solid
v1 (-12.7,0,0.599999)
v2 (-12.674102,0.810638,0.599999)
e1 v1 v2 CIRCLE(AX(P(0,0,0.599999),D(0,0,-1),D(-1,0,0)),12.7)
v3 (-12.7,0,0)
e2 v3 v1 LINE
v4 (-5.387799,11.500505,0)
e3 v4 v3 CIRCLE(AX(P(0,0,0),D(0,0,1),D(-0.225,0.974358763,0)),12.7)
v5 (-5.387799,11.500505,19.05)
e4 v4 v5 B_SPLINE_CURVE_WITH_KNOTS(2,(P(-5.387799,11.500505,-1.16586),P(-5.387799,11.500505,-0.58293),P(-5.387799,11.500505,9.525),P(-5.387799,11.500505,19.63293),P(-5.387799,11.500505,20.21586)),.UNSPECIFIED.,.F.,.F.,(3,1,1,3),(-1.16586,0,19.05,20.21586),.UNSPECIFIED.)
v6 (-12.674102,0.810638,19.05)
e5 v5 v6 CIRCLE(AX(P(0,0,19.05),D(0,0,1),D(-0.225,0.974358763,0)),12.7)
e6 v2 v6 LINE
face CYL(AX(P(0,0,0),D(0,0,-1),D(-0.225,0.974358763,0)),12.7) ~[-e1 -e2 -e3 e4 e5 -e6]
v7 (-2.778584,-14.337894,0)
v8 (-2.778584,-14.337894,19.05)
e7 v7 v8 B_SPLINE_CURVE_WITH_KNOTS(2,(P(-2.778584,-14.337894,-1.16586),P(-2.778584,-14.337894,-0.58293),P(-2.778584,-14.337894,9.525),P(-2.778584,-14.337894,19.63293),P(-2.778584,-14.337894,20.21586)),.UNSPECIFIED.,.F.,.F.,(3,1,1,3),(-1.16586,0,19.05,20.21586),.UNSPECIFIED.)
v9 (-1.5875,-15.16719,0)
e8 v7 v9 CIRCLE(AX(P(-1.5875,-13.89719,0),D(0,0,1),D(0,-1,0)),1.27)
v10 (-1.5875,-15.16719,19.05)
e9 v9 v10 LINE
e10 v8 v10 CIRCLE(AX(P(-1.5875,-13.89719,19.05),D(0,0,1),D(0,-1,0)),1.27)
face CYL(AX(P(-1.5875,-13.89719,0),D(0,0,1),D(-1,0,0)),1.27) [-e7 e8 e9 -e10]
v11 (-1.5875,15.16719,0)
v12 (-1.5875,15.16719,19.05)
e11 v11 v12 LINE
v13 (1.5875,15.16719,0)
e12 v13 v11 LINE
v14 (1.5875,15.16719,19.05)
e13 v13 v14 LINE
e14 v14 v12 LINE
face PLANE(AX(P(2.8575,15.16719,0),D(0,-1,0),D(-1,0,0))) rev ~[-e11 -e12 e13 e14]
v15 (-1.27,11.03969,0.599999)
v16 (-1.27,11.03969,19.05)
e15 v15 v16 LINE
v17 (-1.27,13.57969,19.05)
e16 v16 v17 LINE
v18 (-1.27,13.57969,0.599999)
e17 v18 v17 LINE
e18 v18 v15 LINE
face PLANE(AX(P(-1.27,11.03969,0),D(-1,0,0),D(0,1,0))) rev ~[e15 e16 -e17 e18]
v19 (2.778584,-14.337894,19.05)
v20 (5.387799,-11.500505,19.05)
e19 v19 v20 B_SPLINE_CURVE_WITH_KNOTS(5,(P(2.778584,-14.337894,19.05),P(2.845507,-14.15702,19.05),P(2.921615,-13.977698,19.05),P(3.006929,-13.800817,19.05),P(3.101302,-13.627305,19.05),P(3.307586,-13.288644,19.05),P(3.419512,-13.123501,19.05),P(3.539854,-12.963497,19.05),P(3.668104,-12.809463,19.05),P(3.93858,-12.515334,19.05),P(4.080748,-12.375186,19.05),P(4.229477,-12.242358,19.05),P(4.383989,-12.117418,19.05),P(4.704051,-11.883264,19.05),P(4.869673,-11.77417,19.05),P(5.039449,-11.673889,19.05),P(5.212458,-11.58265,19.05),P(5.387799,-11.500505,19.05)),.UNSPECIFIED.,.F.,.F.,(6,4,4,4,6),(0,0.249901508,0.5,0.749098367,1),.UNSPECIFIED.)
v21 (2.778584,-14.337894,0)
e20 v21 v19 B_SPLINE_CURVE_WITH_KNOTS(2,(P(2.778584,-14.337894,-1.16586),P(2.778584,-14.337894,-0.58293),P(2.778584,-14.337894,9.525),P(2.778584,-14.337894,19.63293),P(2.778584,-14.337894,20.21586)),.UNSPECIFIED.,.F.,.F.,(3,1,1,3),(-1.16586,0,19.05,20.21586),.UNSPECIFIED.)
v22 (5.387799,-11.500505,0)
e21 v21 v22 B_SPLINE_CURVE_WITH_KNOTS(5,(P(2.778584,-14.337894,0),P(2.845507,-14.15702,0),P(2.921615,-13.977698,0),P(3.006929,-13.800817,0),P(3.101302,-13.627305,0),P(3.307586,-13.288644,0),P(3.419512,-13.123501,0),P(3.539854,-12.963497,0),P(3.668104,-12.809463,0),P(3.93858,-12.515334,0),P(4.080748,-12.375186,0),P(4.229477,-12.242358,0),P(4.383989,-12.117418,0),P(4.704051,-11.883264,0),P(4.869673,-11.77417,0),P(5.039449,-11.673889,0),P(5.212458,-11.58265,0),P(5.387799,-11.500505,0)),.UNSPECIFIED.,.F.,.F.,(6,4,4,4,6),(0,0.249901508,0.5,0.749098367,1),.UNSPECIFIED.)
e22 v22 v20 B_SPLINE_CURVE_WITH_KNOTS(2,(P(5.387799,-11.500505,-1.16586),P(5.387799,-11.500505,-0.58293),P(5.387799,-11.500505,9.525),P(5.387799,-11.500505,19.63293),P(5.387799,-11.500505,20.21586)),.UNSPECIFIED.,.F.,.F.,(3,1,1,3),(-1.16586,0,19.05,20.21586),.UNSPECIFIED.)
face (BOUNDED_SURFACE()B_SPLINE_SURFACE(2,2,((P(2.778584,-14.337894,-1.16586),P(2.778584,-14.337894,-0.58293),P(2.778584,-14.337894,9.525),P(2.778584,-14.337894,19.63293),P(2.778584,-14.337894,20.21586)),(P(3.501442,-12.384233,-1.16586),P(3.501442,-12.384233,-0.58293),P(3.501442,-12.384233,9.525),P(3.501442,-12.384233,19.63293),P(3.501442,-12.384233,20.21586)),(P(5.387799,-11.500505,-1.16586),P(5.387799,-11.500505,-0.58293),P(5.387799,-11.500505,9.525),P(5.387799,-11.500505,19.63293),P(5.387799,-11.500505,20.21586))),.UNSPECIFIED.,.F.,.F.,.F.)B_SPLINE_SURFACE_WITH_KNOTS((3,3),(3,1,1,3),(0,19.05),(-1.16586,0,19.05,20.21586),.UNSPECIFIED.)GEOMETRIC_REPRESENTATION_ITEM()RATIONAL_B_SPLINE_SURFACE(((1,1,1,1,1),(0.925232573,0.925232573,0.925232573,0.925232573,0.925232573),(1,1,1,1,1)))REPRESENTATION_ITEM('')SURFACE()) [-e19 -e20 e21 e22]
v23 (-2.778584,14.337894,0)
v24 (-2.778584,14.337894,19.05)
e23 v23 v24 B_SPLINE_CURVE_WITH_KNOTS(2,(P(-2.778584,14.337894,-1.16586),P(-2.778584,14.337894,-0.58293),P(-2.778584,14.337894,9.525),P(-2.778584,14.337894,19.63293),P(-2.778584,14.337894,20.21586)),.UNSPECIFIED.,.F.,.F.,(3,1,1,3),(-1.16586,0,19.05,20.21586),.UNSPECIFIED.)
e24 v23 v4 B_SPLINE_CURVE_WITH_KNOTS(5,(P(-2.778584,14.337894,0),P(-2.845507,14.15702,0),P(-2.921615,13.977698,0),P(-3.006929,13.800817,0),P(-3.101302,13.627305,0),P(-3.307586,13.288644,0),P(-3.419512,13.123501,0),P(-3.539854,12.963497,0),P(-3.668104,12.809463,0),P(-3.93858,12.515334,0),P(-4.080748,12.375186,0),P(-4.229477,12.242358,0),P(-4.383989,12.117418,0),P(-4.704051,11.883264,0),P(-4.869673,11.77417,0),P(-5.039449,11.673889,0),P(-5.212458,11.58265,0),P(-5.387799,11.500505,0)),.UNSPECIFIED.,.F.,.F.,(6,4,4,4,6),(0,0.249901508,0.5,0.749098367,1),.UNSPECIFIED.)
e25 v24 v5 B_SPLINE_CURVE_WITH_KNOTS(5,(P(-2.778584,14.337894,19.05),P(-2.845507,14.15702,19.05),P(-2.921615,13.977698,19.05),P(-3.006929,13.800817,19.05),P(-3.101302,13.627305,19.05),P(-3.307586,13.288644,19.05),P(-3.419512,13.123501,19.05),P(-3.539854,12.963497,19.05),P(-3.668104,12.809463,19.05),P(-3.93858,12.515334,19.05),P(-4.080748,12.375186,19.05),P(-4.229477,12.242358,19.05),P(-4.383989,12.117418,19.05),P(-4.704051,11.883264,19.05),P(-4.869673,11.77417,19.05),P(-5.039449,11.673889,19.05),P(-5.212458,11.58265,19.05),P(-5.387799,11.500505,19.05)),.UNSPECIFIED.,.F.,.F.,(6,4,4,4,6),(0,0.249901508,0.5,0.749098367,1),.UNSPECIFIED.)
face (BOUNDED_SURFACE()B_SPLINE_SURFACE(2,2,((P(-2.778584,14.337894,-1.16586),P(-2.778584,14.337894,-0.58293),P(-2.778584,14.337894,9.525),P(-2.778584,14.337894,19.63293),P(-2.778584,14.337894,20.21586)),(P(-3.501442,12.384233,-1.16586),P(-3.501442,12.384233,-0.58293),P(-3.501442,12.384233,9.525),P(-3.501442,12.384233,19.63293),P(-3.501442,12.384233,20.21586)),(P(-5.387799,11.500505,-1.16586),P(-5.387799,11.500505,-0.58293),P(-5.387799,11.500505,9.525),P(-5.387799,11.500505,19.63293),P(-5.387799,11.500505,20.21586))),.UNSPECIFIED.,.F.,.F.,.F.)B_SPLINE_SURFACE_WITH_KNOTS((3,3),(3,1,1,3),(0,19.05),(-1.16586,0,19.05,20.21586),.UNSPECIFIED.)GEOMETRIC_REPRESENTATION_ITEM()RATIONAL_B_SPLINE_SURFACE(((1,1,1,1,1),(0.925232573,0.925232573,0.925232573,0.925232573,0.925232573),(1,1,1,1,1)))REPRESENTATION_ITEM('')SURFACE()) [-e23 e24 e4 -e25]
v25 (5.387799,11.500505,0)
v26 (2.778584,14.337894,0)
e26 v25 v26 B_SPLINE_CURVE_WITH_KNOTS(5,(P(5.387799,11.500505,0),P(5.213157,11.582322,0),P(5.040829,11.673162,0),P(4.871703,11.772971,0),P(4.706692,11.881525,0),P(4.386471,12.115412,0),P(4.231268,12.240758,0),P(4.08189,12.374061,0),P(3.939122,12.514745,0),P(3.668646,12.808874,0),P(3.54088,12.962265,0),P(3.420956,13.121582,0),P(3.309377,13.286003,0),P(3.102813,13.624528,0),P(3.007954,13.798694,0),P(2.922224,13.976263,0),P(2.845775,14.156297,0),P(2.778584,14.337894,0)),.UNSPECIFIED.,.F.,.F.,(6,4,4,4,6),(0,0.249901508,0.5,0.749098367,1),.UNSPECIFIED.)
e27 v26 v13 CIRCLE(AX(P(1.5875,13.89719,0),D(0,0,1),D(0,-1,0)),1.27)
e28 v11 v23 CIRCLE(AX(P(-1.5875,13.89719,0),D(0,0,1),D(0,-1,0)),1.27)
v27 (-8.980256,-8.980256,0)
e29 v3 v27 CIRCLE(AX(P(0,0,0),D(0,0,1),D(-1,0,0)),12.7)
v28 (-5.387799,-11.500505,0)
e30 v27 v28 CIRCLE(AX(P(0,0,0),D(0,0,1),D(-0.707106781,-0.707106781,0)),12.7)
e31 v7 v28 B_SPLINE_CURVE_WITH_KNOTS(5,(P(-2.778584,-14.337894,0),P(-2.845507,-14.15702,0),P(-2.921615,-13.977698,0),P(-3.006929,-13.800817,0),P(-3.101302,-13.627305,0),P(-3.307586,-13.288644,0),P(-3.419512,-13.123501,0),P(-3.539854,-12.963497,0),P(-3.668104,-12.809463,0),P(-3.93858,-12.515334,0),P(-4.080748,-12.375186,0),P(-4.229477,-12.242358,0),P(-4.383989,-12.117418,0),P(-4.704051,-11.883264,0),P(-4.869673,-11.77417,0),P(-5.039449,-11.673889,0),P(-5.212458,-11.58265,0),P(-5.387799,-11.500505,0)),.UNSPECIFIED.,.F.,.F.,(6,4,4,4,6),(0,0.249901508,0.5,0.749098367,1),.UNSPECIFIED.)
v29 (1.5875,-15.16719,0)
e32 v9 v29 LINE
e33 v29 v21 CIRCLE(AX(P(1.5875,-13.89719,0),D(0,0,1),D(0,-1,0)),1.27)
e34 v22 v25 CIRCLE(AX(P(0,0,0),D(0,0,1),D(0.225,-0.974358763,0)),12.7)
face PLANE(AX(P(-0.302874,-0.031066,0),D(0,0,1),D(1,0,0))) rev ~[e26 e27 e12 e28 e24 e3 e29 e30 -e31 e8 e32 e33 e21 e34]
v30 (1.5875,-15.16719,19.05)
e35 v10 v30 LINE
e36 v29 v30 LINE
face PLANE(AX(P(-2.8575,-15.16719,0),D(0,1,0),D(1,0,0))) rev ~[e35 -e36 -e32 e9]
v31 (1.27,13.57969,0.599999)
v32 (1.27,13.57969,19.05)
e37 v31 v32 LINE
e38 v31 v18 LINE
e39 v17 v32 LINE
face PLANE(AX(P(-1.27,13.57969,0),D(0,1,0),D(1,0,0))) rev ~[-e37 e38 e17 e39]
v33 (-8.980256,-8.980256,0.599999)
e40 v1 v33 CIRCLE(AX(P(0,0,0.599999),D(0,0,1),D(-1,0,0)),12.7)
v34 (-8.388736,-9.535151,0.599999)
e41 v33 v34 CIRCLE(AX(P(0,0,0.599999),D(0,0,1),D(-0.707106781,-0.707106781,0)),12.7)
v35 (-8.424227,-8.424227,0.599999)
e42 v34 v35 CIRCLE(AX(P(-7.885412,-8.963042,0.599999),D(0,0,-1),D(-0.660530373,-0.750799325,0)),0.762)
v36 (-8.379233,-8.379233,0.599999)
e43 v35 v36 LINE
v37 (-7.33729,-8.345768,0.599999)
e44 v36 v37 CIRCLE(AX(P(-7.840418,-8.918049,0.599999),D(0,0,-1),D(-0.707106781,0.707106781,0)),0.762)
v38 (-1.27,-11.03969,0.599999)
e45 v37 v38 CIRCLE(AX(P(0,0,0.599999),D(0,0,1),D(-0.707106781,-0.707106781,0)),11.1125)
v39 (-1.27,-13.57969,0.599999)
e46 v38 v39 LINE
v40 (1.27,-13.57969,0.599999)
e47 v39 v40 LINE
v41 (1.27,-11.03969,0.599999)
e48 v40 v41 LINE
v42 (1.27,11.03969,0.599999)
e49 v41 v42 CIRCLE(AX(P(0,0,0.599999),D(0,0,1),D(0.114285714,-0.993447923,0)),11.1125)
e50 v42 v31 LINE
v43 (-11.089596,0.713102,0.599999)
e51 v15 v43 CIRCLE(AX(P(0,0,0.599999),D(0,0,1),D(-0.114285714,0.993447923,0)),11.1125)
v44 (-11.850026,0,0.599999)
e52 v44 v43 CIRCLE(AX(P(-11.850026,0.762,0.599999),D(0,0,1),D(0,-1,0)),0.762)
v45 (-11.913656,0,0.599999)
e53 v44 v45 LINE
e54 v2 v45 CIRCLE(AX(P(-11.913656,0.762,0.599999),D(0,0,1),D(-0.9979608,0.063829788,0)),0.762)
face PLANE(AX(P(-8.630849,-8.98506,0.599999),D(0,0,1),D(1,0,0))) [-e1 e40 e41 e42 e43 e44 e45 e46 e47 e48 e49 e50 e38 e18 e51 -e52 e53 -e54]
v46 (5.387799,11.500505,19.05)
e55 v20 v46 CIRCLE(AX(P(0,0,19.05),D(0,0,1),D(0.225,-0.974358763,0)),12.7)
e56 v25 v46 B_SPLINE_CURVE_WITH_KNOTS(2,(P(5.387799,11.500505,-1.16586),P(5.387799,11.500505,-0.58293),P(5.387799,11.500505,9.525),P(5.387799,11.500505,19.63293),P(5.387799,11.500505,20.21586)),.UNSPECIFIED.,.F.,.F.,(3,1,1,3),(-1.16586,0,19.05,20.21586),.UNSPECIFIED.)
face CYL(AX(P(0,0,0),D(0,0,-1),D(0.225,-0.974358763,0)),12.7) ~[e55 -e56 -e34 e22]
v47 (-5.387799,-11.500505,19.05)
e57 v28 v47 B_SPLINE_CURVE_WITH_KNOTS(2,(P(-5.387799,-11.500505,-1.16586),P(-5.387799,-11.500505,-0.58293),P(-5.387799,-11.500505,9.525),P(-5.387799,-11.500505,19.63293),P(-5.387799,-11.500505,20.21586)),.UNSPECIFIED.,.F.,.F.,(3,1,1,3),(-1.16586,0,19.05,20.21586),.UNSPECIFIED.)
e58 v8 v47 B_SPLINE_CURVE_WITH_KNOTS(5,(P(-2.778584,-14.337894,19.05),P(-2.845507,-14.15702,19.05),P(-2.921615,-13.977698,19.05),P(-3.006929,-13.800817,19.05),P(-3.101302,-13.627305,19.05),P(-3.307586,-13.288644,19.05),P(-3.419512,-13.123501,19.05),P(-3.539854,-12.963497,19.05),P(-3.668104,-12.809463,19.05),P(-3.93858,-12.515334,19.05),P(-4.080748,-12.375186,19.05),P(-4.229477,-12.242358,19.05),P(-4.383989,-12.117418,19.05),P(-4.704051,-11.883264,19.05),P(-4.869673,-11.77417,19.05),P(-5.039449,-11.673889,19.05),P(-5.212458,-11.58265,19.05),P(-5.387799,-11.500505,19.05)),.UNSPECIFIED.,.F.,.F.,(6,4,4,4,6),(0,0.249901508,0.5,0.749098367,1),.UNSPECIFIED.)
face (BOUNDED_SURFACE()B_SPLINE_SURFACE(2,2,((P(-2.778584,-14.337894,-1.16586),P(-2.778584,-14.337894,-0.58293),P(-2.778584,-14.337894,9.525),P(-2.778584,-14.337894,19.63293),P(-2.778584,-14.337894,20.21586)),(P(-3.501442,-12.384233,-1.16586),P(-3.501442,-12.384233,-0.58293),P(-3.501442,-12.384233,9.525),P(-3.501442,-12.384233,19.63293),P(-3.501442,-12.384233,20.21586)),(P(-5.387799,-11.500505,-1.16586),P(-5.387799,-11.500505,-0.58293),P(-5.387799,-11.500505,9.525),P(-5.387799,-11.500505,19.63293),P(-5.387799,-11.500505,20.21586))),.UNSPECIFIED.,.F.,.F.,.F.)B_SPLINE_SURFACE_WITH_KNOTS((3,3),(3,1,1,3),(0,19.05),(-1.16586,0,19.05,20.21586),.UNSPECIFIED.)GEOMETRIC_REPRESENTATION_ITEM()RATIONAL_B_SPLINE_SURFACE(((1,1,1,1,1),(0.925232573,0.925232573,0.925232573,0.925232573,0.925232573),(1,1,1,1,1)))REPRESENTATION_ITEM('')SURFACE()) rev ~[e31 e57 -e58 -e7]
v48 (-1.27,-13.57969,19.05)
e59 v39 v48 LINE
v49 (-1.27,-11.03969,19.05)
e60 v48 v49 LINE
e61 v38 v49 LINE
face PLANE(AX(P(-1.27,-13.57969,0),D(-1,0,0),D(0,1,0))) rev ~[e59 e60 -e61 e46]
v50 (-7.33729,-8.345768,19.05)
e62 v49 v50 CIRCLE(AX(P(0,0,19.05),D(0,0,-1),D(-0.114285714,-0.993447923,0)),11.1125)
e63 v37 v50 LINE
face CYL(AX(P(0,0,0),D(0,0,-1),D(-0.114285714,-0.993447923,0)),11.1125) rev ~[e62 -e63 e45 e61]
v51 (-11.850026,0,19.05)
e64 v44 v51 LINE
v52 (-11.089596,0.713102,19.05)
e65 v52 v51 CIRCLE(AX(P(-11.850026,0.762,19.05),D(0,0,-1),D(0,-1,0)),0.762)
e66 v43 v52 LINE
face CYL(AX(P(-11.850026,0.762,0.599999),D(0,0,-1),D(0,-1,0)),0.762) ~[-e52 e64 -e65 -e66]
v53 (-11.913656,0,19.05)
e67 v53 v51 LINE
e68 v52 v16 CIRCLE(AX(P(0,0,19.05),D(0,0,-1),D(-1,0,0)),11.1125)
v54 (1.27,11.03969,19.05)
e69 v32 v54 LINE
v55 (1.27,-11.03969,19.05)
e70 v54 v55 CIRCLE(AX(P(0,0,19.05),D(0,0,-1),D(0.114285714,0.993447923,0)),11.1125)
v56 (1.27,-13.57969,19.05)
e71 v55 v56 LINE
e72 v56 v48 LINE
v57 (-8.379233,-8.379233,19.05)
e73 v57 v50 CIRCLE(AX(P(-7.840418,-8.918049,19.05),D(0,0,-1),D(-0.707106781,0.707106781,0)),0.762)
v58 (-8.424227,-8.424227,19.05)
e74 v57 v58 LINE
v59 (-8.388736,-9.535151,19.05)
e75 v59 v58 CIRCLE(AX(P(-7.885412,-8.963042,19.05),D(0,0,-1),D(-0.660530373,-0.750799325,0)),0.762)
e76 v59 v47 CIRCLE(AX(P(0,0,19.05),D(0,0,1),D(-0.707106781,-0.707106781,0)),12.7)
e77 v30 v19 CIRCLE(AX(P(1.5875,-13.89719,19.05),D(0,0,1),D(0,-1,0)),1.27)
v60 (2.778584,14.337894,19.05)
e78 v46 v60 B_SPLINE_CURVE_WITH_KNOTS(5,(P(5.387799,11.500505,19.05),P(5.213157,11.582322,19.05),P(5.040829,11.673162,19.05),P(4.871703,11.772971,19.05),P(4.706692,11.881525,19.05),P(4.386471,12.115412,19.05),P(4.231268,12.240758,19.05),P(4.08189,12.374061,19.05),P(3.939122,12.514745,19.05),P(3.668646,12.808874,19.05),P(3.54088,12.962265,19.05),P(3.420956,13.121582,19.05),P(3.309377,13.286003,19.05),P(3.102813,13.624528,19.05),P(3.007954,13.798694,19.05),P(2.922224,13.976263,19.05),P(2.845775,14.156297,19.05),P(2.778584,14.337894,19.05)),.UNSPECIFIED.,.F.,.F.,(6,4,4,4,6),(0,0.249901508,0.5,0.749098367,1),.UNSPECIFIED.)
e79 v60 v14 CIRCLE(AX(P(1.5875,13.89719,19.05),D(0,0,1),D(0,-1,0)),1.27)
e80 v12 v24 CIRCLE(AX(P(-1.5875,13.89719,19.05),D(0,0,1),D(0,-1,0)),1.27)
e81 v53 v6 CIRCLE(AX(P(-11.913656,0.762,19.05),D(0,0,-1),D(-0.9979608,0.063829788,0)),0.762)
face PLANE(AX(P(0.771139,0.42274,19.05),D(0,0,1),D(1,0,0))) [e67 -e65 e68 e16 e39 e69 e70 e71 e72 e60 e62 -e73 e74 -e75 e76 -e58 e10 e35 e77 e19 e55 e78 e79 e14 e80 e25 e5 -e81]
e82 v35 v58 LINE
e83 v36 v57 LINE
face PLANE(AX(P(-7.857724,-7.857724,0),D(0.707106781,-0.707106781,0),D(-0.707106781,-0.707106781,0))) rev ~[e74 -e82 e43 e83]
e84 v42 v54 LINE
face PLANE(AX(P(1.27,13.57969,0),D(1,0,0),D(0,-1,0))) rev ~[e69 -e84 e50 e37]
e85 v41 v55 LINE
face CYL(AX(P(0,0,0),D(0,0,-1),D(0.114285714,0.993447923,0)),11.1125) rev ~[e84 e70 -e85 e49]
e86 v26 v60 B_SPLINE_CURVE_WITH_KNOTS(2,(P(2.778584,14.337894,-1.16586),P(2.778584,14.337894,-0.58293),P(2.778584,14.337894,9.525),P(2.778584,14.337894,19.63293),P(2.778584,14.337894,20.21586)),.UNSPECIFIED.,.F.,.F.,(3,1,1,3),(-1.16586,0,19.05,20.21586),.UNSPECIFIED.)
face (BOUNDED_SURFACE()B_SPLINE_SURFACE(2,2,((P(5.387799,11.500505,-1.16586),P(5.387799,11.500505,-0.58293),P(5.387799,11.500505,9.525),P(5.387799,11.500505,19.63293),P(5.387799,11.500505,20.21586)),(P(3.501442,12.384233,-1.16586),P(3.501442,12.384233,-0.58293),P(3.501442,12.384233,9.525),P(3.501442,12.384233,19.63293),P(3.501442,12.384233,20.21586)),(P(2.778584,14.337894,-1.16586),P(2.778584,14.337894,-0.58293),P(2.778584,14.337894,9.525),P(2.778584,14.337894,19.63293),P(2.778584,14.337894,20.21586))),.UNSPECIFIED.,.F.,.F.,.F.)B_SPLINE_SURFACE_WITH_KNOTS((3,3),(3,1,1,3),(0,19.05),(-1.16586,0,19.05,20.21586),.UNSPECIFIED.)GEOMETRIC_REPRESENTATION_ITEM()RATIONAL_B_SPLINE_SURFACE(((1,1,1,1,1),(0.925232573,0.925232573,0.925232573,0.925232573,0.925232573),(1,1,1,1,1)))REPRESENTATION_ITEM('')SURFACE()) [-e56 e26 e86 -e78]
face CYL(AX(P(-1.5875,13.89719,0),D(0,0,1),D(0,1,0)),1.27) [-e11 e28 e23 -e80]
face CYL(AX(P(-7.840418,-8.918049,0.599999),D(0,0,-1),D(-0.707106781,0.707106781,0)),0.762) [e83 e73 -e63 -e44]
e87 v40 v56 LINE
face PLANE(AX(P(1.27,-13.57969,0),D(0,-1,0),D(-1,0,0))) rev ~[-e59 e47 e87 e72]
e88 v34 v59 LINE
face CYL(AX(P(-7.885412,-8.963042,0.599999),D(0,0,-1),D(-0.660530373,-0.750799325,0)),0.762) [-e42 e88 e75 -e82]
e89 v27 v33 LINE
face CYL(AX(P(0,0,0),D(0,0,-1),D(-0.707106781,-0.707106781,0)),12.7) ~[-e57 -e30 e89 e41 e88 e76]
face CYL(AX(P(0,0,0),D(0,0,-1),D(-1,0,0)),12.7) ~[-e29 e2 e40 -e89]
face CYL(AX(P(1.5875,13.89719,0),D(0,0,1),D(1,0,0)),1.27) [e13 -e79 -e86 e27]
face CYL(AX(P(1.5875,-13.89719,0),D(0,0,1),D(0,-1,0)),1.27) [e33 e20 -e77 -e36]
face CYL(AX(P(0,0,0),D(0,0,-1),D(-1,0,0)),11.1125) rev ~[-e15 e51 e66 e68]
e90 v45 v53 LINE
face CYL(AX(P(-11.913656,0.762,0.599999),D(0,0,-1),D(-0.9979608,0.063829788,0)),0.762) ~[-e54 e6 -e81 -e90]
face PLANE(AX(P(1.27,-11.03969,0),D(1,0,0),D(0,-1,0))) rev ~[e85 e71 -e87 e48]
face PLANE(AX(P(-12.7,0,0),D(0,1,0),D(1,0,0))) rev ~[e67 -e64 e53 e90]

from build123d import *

# Parameters (mm, degrees)
F1_DEPTH    = 0.5999988
F2_DEPTH    = 19.05
F3_R        = 1.27
F4_R        = 5.08
F5_T1_DEPTH = 20.4776308939
F5_T3_DEPTH = 20.2938151504


# Not quite as in the source:
# - a fillet or chamfer that OpenCascade refuses, or shapes differently, is made with other operations: its cross-section is extruded or revolved along the edge and cut away or added


with BuildPart() as f1:
    # F0 (on Top) → F1 (new body)
    with BuildSketch(Plane.XY):
        with BuildLine():
            Line((-1.27, 13.5796900432), (-1.27, 11.0396900432))
            ThreePointArc((-1.27, 11.0396900432), (-8.2945925533, 7.3950923338), (-11.1125, 0))
            ThreePointArc((-11.1125, 0), (-10.266611305, -4.2525696422), (-7.8577241059, -7.8577241059))
            ThreePointArc((-7.8577241059, -7.8577241059), (-4.8332249736, -10.0063775966), (-1.27, -11.0396900432))
            Line((-1.27, -11.0396900432), (-1.27, -13.5796900432))
            Line((-1.27, -13.5796900432), (0, -13.5796900432))
            Line((0, -13.5796900432), (1.27, -13.5796900432))
            Line((1.27, -13.5796900432), (1.27, -11.0396900432))
            ThreePointArc((1.27, -11.0396900432), (11.1125, 0), (1.27, 11.0396900432))
            Line((1.27, 11.0396900432), (1.27, 13.5796900432))
            Line((1.27, 13.5796900432), (0, 13.5796900432))
            Line((0, 13.5796900432), (-1.27, 13.5796900432))
        make_face()
        with BuildLine():
            ThreePointArc((-7.8577241059, -7.8577241059), (-10.266611305, -4.2525696422), (-11.1125, 0))
            Line((-11.1125, 0), (-12.7, 0))
            ThreePointArc((-12.7, 0), (-11.7332700629, -4.860079591), (-8.9802561211, -8.9802561211))
            Line((-8.9802561211, -8.9802561211), (-7.8577241059, -7.8577241059))
        make_face()
    extrude(amount=F1_DEPTH)

    # F0 (on Top) → F2 (join)
    with BuildSketch(Plane.XY):
        with BuildLine():
            ThreePointArc((-11.1125, 0), (-8.2945925533, 7.3950923338), (-1.27, 11.0396900432))
            Line((-1.27, 11.0396900432), (-1.27, 13.5796900432))
            Line((-1.27, 13.5796900432), (0, 13.5796900432))
            Line((0, 13.5796900432), (1.27, 13.5796900432))
            Line((1.27, 13.5796900432), (1.27, 11.0396900432))
            ThreePointArc((1.27, 11.0396900432), (11.1125, 0), (1.27, -11.0396900432))
            Line((1.27, -11.0396900432), (1.27, -13.5796900432))
            Line((1.27, -13.5796900432), (0, -13.5796900432))
            Line((0, -13.5796900432), (-1.27, -13.5796900432))
            Line((-1.27, -13.5796900432), (-1.27, -11.0396900432))
            ThreePointArc((-1.27, -11.0396900432), (-4.8332249736, -10.0063775966), (-7.8577241059, -7.8577241059))
            Line((-7.8577241059, -7.8577241059), (-8.9802561211, -8.9802561211))
            ThreePointArc((-8.9802561211, -8.9802561211), (-6.1573611633, -11.1075156315), (-2.8575, -12.3743562964))
            Line((-2.8575, -12.3743562964), (-2.8575, -15.1671900432))
            Line((-2.8575, -15.1671900432), (0, -15.1671900432))
            Line((0, -15.1671900432), (2.8575, -15.1671900432))
            Line((2.8575, -15.1671900432), (2.8575, -12.3743562964))
            ThreePointArc((2.8575, -12.3743562964), (12.7, 0), (2.8575, 12.3743562964))
            Line((2.8575, 12.3743562964), (2.8575, 15.1671900432))
            Line((2.8575, 15.1671900432), (0, 15.1671900432))
            Line((0, 15.1671900432), (-2.8575, 15.1671900432))
            Line((-2.8575, 15.1671900432), (-2.8575, 12.3743562964))
            ThreePointArc((-2.8575, 12.3743562964), (-9.93932216, 7.9056862447), (-12.7, 0))
            Line((-12.7, 0), (-11.1125, 0))
        make_face()
    extrude(amount=F2_DEPTH)

    # F3
    f3_edges = [f1.edges().sort_by_distance(p)[0] for p in [
        (2.8575, -15.16719, 9.525),
        (-2.8575, -15.16719, 9.525),
        (-2.8575, 15.16719, 9.525),
        (2.8575, 15.16719, 9.525),
    ]]
    fillet(f3_edges, radius=F3_R)

    # F4
    f4_edges = [f1.edges().sort_by_distance(p)[0] for p in [
        (2.8575, 12.374356, 9.525),
        (-2.8575, 12.374356, 9.525),
        (-2.8575, -12.374356, 9.525),
        (2.8575, -12.374356, 9.525),
    ]]
    fillet(f4_edges, radius=F4_R)

    # F5: fillet of radius 0.762 on 4 edges, made by hand

    # F5_s2 → F5_t1 (cut)
    with BuildSketch(Plane.XY.offset(0.5999988)):
        with BuildLine():
            ThreePointArc((-12.6741021595, 0.8106382979), (-12.4694016476, 0.2406643993), (-11.91365603, 0))
            Line((-11.91365603, 0), (-12.7, 0))
            ThreePointArc((-12.7, 0), (-12.6935238887, 0.4055259388), (-12.6741021595, 0.8106382979))
        make_face()
        with BuildLine():
            ThreePointArc((-8.3887357449, -9.53515142), (-8.6470230336, -8.9873738911), (-8.4242269675, -8.4242269675))
            Line((-8.4242269675, -8.4242269675), (-8.9802561211, -8.9802561211))
            ThreePointArc((-8.9802561211, -8.9802561211), (-8.6889266776, -9.2624269601), (-8.3887357449, -9.53515142))
        make_face()
    extrude(amount=F5_T1_DEPTH, mode=Mode.SUBTRACT)

    # F5_s4 → F5_t3 (cut)
    with BuildSketch(Plane.XY.offset(0.5999988)):
        with BuildLine():
            ThreePointArc((-11.8500255801, 0), (-11.3287850299, 0.2061652325), (-11.0895961312, 0.7131016043))
            ThreePointArc((-11.0895961312, 0.7131016043), (-11.1067725568, 0.3567346651), (-11.1125, 0))
            Line((-11.1125, 0), (-11.8500255801, 0))
        make_face()
        with BuildLine():
            ThreePointArc((-8.379233445, -8.379233445), (-7.8648798833, -8.1564415512), (-7.3372896449, -8.345767605))
            ThreePointArc((-7.3372896449, -8.345767605), (-7.6014246912, -8.1059236928), (-7.8577241059, -7.8577241059))
            Line((-7.8577241059, -7.8577241059), (-8.379233445, -8.379233445))
        make_face()
    extrude(amount=F5_T3_DEPTH, mode=Mode.SUBTRACT)


solid = f1.part
